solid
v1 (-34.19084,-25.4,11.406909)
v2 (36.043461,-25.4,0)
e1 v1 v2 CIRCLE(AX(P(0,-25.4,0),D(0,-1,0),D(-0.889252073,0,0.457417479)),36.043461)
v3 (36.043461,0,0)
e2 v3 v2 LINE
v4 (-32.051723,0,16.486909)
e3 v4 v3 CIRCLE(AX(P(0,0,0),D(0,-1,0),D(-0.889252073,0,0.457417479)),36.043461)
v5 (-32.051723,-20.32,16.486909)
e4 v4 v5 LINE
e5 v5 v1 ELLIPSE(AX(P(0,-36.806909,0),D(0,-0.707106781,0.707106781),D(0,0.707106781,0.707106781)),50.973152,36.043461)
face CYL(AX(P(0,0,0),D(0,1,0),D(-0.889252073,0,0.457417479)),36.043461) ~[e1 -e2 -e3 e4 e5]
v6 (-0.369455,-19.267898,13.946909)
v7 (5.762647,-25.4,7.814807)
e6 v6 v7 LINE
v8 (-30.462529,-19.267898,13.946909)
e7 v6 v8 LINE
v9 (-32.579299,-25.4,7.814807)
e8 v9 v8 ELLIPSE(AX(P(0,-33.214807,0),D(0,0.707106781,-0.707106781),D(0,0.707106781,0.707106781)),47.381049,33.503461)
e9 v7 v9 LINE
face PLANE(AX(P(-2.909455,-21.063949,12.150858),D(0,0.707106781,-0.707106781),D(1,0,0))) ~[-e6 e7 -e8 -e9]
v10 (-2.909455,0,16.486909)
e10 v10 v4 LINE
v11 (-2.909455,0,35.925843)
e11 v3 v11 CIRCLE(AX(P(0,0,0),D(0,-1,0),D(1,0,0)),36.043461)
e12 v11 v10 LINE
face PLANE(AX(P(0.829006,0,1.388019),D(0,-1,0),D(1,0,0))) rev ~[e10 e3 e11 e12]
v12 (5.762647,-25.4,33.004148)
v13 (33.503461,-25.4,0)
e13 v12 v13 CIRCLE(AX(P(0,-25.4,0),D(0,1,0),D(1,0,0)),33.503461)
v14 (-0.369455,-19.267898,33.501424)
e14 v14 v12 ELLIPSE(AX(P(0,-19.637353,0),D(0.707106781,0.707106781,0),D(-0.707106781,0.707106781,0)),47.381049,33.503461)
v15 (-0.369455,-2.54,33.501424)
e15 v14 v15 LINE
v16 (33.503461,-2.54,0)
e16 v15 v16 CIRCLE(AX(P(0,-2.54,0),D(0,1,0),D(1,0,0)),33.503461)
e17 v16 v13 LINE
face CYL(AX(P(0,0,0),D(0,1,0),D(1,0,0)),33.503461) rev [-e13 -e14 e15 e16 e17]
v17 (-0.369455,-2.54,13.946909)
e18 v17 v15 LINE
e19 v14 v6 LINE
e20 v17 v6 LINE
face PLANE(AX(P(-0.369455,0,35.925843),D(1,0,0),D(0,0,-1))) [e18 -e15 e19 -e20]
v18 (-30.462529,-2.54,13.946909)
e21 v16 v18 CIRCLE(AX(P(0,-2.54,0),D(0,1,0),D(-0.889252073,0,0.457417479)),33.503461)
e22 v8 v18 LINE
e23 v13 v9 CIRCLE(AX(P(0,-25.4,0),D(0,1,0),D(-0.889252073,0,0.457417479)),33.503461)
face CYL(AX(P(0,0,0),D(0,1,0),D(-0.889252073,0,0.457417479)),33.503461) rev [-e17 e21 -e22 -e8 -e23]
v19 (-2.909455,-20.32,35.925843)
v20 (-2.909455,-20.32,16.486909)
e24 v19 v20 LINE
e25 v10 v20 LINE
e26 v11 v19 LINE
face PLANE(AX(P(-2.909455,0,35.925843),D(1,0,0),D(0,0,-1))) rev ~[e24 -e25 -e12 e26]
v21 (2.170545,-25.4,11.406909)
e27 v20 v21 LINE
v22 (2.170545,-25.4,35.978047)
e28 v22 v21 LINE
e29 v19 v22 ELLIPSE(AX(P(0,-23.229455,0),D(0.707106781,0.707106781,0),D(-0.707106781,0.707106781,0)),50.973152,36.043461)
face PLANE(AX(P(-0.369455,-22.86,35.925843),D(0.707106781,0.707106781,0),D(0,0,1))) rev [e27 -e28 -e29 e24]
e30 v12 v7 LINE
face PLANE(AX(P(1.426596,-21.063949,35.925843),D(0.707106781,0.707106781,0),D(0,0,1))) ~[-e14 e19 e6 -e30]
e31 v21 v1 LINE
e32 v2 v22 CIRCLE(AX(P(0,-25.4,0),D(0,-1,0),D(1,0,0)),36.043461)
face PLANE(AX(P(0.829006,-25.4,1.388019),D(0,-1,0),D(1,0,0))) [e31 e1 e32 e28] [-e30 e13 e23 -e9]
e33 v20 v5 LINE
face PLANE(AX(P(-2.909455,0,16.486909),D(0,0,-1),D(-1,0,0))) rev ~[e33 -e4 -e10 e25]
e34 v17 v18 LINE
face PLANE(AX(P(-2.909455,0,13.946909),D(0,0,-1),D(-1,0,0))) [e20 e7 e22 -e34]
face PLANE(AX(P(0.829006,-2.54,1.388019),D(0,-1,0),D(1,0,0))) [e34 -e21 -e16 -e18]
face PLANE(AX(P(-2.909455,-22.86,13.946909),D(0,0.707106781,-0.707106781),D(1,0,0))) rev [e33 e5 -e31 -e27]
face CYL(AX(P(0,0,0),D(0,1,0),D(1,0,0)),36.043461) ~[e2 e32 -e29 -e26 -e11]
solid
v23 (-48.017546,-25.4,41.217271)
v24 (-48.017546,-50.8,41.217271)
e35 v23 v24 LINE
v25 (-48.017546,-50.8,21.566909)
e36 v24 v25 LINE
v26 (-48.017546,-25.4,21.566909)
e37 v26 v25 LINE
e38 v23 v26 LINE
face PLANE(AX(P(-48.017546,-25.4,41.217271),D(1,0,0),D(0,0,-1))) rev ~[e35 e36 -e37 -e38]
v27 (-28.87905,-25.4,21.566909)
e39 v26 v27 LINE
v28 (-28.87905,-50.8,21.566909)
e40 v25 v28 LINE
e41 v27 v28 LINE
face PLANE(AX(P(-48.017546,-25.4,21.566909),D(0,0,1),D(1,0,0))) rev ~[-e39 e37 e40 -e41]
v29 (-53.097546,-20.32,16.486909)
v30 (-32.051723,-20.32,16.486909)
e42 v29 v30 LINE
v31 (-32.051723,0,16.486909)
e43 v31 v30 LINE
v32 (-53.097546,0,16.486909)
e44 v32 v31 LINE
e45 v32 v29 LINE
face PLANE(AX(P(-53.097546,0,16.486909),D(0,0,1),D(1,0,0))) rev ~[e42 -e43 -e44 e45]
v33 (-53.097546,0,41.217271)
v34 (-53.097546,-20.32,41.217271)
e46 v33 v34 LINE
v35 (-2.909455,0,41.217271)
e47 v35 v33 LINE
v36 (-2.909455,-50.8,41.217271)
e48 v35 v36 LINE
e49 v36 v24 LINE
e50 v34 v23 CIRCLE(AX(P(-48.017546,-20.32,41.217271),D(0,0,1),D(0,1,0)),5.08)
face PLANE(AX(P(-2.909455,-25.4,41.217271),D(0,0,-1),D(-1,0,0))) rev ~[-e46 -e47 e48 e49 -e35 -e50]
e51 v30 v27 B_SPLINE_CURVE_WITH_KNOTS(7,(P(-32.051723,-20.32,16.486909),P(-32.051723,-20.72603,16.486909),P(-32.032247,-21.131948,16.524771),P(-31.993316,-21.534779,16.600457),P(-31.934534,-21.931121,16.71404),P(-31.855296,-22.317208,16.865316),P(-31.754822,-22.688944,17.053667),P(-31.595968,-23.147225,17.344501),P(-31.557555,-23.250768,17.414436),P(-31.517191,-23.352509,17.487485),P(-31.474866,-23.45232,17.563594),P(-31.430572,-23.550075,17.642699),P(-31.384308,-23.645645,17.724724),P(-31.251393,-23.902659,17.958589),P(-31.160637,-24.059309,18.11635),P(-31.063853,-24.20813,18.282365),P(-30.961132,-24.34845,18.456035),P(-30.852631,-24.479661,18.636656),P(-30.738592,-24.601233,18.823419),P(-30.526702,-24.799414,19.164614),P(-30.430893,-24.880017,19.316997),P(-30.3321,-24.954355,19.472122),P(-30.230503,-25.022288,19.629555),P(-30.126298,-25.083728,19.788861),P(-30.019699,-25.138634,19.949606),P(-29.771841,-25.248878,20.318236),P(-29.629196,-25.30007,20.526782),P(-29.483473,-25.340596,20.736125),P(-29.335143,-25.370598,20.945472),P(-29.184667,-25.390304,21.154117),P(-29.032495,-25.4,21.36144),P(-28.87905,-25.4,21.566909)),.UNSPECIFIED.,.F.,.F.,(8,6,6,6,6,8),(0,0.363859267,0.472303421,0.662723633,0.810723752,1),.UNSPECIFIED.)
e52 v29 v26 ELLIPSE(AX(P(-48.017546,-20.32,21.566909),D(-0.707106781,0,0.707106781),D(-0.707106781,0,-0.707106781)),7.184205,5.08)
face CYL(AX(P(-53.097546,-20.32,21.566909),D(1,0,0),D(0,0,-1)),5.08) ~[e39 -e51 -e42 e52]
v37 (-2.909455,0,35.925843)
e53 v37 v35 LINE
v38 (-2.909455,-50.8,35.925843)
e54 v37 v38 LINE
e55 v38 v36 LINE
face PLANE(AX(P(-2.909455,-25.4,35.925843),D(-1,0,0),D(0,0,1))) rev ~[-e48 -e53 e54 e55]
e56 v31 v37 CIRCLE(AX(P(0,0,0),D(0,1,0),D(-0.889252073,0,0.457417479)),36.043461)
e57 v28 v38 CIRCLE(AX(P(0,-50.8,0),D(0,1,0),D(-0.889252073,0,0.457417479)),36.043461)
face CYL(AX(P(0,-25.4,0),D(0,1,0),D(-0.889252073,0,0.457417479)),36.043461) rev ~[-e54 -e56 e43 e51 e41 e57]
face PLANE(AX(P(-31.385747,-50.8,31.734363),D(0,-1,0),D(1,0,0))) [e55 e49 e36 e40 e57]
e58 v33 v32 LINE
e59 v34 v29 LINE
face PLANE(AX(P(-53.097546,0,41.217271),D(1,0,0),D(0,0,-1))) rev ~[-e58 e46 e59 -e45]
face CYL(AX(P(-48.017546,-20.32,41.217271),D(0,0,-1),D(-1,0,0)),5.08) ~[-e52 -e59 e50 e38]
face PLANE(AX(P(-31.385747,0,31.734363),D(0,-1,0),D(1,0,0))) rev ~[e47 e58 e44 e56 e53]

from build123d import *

# Parameters (mm, degrees)
F1_DEPTH = 25.4
F2_R     = 5.08
F3_SIZE  = 5.08
F4_T     = -2.54
F5_DEPTH = 25.4


with BuildPart() as f1:
    # F0 (on Front) → F1 (new body)
    with BuildSketch(Plane.XZ):
        with BuildLine():
            ThreePointArc((-32.0517227431, 16.4869092405), (-20.0009755061, 29.9848642803), (-2.9094549827, 35.925842771))
            Line((-2.9094549827, 35.925842771), (-2.9094549827, 41.2172712386))
            Line((-2.9094549827, 41.2172712386), (-53.0975461006, 41.2172712386))
            Line((-53.0975461006, 41.2172712386), (-53.0975461006, 16.4869092405))
            Line((-53.0975461006, 16.4869092405), (-32.0517227431, 16.4869092405))
        make_face()
    extrude(amount=F1_DEPTH)

    # F2
    f2_edges = [f1.edges().sort_by_distance(p)[0] for p in [
        (-53.097546, -25.4, 28.85209),
        (-42.574634, -25.4, 16.486909),
    ]]
    fillet(f2_edges, radius=F2_R)

    # F5 (add): a face of the model
    f5_faces = [f1.faces().sort_by_distance(p)[0] for p in [
        (-30.4342357223, -25.4, 33.0216663243),
    ]]
    extrude(f5_faces, amount=F5_DEPTH)


with BuildPart() as f1b:
    # F0 (on Front) → F1, piece 2 (new body)
    with BuildSketch(Plane.XZ):
        with BuildLine():
            ThreePointArc((-32.0517227431, 16.4869092405), (-8.4816294649, -35.0313155437), (36.0434613641, 0))
            ThreePointArc((36.0434613641, 0), (24.4362873494, 26.4952631178), (-2.9094549827, 35.925842771))
            Line((-2.9094549827, 35.925842771), (-2.9094549827, 16.4869092405))
            Line((-2.9094549827, 16.4869092405), (-32.0517227431, 16.4869092405))
        make_face()
    extrude(amount=F1_DEPTH)

    # F3
    f3_edges = [f1b.edges().sort_by_distance(p)[0] for p in [
        (-17.480589, -25.4, 16.486909),
        (-2.909455, -25.4, 26.206376),
    ]]
    chamfer(f3_edges, length=F3_SIZE)

    # F4
    f4_openings = [f1b.faces().sort_by_distance(p)[0] for p in [
        (2.458641, -25.4, -4.276447),
    ]]
    offset(amount=F4_T, openings=f4_openings, kind=Kind.INTERSECTION)


solid = Compound([f1.part, f1b.part])
